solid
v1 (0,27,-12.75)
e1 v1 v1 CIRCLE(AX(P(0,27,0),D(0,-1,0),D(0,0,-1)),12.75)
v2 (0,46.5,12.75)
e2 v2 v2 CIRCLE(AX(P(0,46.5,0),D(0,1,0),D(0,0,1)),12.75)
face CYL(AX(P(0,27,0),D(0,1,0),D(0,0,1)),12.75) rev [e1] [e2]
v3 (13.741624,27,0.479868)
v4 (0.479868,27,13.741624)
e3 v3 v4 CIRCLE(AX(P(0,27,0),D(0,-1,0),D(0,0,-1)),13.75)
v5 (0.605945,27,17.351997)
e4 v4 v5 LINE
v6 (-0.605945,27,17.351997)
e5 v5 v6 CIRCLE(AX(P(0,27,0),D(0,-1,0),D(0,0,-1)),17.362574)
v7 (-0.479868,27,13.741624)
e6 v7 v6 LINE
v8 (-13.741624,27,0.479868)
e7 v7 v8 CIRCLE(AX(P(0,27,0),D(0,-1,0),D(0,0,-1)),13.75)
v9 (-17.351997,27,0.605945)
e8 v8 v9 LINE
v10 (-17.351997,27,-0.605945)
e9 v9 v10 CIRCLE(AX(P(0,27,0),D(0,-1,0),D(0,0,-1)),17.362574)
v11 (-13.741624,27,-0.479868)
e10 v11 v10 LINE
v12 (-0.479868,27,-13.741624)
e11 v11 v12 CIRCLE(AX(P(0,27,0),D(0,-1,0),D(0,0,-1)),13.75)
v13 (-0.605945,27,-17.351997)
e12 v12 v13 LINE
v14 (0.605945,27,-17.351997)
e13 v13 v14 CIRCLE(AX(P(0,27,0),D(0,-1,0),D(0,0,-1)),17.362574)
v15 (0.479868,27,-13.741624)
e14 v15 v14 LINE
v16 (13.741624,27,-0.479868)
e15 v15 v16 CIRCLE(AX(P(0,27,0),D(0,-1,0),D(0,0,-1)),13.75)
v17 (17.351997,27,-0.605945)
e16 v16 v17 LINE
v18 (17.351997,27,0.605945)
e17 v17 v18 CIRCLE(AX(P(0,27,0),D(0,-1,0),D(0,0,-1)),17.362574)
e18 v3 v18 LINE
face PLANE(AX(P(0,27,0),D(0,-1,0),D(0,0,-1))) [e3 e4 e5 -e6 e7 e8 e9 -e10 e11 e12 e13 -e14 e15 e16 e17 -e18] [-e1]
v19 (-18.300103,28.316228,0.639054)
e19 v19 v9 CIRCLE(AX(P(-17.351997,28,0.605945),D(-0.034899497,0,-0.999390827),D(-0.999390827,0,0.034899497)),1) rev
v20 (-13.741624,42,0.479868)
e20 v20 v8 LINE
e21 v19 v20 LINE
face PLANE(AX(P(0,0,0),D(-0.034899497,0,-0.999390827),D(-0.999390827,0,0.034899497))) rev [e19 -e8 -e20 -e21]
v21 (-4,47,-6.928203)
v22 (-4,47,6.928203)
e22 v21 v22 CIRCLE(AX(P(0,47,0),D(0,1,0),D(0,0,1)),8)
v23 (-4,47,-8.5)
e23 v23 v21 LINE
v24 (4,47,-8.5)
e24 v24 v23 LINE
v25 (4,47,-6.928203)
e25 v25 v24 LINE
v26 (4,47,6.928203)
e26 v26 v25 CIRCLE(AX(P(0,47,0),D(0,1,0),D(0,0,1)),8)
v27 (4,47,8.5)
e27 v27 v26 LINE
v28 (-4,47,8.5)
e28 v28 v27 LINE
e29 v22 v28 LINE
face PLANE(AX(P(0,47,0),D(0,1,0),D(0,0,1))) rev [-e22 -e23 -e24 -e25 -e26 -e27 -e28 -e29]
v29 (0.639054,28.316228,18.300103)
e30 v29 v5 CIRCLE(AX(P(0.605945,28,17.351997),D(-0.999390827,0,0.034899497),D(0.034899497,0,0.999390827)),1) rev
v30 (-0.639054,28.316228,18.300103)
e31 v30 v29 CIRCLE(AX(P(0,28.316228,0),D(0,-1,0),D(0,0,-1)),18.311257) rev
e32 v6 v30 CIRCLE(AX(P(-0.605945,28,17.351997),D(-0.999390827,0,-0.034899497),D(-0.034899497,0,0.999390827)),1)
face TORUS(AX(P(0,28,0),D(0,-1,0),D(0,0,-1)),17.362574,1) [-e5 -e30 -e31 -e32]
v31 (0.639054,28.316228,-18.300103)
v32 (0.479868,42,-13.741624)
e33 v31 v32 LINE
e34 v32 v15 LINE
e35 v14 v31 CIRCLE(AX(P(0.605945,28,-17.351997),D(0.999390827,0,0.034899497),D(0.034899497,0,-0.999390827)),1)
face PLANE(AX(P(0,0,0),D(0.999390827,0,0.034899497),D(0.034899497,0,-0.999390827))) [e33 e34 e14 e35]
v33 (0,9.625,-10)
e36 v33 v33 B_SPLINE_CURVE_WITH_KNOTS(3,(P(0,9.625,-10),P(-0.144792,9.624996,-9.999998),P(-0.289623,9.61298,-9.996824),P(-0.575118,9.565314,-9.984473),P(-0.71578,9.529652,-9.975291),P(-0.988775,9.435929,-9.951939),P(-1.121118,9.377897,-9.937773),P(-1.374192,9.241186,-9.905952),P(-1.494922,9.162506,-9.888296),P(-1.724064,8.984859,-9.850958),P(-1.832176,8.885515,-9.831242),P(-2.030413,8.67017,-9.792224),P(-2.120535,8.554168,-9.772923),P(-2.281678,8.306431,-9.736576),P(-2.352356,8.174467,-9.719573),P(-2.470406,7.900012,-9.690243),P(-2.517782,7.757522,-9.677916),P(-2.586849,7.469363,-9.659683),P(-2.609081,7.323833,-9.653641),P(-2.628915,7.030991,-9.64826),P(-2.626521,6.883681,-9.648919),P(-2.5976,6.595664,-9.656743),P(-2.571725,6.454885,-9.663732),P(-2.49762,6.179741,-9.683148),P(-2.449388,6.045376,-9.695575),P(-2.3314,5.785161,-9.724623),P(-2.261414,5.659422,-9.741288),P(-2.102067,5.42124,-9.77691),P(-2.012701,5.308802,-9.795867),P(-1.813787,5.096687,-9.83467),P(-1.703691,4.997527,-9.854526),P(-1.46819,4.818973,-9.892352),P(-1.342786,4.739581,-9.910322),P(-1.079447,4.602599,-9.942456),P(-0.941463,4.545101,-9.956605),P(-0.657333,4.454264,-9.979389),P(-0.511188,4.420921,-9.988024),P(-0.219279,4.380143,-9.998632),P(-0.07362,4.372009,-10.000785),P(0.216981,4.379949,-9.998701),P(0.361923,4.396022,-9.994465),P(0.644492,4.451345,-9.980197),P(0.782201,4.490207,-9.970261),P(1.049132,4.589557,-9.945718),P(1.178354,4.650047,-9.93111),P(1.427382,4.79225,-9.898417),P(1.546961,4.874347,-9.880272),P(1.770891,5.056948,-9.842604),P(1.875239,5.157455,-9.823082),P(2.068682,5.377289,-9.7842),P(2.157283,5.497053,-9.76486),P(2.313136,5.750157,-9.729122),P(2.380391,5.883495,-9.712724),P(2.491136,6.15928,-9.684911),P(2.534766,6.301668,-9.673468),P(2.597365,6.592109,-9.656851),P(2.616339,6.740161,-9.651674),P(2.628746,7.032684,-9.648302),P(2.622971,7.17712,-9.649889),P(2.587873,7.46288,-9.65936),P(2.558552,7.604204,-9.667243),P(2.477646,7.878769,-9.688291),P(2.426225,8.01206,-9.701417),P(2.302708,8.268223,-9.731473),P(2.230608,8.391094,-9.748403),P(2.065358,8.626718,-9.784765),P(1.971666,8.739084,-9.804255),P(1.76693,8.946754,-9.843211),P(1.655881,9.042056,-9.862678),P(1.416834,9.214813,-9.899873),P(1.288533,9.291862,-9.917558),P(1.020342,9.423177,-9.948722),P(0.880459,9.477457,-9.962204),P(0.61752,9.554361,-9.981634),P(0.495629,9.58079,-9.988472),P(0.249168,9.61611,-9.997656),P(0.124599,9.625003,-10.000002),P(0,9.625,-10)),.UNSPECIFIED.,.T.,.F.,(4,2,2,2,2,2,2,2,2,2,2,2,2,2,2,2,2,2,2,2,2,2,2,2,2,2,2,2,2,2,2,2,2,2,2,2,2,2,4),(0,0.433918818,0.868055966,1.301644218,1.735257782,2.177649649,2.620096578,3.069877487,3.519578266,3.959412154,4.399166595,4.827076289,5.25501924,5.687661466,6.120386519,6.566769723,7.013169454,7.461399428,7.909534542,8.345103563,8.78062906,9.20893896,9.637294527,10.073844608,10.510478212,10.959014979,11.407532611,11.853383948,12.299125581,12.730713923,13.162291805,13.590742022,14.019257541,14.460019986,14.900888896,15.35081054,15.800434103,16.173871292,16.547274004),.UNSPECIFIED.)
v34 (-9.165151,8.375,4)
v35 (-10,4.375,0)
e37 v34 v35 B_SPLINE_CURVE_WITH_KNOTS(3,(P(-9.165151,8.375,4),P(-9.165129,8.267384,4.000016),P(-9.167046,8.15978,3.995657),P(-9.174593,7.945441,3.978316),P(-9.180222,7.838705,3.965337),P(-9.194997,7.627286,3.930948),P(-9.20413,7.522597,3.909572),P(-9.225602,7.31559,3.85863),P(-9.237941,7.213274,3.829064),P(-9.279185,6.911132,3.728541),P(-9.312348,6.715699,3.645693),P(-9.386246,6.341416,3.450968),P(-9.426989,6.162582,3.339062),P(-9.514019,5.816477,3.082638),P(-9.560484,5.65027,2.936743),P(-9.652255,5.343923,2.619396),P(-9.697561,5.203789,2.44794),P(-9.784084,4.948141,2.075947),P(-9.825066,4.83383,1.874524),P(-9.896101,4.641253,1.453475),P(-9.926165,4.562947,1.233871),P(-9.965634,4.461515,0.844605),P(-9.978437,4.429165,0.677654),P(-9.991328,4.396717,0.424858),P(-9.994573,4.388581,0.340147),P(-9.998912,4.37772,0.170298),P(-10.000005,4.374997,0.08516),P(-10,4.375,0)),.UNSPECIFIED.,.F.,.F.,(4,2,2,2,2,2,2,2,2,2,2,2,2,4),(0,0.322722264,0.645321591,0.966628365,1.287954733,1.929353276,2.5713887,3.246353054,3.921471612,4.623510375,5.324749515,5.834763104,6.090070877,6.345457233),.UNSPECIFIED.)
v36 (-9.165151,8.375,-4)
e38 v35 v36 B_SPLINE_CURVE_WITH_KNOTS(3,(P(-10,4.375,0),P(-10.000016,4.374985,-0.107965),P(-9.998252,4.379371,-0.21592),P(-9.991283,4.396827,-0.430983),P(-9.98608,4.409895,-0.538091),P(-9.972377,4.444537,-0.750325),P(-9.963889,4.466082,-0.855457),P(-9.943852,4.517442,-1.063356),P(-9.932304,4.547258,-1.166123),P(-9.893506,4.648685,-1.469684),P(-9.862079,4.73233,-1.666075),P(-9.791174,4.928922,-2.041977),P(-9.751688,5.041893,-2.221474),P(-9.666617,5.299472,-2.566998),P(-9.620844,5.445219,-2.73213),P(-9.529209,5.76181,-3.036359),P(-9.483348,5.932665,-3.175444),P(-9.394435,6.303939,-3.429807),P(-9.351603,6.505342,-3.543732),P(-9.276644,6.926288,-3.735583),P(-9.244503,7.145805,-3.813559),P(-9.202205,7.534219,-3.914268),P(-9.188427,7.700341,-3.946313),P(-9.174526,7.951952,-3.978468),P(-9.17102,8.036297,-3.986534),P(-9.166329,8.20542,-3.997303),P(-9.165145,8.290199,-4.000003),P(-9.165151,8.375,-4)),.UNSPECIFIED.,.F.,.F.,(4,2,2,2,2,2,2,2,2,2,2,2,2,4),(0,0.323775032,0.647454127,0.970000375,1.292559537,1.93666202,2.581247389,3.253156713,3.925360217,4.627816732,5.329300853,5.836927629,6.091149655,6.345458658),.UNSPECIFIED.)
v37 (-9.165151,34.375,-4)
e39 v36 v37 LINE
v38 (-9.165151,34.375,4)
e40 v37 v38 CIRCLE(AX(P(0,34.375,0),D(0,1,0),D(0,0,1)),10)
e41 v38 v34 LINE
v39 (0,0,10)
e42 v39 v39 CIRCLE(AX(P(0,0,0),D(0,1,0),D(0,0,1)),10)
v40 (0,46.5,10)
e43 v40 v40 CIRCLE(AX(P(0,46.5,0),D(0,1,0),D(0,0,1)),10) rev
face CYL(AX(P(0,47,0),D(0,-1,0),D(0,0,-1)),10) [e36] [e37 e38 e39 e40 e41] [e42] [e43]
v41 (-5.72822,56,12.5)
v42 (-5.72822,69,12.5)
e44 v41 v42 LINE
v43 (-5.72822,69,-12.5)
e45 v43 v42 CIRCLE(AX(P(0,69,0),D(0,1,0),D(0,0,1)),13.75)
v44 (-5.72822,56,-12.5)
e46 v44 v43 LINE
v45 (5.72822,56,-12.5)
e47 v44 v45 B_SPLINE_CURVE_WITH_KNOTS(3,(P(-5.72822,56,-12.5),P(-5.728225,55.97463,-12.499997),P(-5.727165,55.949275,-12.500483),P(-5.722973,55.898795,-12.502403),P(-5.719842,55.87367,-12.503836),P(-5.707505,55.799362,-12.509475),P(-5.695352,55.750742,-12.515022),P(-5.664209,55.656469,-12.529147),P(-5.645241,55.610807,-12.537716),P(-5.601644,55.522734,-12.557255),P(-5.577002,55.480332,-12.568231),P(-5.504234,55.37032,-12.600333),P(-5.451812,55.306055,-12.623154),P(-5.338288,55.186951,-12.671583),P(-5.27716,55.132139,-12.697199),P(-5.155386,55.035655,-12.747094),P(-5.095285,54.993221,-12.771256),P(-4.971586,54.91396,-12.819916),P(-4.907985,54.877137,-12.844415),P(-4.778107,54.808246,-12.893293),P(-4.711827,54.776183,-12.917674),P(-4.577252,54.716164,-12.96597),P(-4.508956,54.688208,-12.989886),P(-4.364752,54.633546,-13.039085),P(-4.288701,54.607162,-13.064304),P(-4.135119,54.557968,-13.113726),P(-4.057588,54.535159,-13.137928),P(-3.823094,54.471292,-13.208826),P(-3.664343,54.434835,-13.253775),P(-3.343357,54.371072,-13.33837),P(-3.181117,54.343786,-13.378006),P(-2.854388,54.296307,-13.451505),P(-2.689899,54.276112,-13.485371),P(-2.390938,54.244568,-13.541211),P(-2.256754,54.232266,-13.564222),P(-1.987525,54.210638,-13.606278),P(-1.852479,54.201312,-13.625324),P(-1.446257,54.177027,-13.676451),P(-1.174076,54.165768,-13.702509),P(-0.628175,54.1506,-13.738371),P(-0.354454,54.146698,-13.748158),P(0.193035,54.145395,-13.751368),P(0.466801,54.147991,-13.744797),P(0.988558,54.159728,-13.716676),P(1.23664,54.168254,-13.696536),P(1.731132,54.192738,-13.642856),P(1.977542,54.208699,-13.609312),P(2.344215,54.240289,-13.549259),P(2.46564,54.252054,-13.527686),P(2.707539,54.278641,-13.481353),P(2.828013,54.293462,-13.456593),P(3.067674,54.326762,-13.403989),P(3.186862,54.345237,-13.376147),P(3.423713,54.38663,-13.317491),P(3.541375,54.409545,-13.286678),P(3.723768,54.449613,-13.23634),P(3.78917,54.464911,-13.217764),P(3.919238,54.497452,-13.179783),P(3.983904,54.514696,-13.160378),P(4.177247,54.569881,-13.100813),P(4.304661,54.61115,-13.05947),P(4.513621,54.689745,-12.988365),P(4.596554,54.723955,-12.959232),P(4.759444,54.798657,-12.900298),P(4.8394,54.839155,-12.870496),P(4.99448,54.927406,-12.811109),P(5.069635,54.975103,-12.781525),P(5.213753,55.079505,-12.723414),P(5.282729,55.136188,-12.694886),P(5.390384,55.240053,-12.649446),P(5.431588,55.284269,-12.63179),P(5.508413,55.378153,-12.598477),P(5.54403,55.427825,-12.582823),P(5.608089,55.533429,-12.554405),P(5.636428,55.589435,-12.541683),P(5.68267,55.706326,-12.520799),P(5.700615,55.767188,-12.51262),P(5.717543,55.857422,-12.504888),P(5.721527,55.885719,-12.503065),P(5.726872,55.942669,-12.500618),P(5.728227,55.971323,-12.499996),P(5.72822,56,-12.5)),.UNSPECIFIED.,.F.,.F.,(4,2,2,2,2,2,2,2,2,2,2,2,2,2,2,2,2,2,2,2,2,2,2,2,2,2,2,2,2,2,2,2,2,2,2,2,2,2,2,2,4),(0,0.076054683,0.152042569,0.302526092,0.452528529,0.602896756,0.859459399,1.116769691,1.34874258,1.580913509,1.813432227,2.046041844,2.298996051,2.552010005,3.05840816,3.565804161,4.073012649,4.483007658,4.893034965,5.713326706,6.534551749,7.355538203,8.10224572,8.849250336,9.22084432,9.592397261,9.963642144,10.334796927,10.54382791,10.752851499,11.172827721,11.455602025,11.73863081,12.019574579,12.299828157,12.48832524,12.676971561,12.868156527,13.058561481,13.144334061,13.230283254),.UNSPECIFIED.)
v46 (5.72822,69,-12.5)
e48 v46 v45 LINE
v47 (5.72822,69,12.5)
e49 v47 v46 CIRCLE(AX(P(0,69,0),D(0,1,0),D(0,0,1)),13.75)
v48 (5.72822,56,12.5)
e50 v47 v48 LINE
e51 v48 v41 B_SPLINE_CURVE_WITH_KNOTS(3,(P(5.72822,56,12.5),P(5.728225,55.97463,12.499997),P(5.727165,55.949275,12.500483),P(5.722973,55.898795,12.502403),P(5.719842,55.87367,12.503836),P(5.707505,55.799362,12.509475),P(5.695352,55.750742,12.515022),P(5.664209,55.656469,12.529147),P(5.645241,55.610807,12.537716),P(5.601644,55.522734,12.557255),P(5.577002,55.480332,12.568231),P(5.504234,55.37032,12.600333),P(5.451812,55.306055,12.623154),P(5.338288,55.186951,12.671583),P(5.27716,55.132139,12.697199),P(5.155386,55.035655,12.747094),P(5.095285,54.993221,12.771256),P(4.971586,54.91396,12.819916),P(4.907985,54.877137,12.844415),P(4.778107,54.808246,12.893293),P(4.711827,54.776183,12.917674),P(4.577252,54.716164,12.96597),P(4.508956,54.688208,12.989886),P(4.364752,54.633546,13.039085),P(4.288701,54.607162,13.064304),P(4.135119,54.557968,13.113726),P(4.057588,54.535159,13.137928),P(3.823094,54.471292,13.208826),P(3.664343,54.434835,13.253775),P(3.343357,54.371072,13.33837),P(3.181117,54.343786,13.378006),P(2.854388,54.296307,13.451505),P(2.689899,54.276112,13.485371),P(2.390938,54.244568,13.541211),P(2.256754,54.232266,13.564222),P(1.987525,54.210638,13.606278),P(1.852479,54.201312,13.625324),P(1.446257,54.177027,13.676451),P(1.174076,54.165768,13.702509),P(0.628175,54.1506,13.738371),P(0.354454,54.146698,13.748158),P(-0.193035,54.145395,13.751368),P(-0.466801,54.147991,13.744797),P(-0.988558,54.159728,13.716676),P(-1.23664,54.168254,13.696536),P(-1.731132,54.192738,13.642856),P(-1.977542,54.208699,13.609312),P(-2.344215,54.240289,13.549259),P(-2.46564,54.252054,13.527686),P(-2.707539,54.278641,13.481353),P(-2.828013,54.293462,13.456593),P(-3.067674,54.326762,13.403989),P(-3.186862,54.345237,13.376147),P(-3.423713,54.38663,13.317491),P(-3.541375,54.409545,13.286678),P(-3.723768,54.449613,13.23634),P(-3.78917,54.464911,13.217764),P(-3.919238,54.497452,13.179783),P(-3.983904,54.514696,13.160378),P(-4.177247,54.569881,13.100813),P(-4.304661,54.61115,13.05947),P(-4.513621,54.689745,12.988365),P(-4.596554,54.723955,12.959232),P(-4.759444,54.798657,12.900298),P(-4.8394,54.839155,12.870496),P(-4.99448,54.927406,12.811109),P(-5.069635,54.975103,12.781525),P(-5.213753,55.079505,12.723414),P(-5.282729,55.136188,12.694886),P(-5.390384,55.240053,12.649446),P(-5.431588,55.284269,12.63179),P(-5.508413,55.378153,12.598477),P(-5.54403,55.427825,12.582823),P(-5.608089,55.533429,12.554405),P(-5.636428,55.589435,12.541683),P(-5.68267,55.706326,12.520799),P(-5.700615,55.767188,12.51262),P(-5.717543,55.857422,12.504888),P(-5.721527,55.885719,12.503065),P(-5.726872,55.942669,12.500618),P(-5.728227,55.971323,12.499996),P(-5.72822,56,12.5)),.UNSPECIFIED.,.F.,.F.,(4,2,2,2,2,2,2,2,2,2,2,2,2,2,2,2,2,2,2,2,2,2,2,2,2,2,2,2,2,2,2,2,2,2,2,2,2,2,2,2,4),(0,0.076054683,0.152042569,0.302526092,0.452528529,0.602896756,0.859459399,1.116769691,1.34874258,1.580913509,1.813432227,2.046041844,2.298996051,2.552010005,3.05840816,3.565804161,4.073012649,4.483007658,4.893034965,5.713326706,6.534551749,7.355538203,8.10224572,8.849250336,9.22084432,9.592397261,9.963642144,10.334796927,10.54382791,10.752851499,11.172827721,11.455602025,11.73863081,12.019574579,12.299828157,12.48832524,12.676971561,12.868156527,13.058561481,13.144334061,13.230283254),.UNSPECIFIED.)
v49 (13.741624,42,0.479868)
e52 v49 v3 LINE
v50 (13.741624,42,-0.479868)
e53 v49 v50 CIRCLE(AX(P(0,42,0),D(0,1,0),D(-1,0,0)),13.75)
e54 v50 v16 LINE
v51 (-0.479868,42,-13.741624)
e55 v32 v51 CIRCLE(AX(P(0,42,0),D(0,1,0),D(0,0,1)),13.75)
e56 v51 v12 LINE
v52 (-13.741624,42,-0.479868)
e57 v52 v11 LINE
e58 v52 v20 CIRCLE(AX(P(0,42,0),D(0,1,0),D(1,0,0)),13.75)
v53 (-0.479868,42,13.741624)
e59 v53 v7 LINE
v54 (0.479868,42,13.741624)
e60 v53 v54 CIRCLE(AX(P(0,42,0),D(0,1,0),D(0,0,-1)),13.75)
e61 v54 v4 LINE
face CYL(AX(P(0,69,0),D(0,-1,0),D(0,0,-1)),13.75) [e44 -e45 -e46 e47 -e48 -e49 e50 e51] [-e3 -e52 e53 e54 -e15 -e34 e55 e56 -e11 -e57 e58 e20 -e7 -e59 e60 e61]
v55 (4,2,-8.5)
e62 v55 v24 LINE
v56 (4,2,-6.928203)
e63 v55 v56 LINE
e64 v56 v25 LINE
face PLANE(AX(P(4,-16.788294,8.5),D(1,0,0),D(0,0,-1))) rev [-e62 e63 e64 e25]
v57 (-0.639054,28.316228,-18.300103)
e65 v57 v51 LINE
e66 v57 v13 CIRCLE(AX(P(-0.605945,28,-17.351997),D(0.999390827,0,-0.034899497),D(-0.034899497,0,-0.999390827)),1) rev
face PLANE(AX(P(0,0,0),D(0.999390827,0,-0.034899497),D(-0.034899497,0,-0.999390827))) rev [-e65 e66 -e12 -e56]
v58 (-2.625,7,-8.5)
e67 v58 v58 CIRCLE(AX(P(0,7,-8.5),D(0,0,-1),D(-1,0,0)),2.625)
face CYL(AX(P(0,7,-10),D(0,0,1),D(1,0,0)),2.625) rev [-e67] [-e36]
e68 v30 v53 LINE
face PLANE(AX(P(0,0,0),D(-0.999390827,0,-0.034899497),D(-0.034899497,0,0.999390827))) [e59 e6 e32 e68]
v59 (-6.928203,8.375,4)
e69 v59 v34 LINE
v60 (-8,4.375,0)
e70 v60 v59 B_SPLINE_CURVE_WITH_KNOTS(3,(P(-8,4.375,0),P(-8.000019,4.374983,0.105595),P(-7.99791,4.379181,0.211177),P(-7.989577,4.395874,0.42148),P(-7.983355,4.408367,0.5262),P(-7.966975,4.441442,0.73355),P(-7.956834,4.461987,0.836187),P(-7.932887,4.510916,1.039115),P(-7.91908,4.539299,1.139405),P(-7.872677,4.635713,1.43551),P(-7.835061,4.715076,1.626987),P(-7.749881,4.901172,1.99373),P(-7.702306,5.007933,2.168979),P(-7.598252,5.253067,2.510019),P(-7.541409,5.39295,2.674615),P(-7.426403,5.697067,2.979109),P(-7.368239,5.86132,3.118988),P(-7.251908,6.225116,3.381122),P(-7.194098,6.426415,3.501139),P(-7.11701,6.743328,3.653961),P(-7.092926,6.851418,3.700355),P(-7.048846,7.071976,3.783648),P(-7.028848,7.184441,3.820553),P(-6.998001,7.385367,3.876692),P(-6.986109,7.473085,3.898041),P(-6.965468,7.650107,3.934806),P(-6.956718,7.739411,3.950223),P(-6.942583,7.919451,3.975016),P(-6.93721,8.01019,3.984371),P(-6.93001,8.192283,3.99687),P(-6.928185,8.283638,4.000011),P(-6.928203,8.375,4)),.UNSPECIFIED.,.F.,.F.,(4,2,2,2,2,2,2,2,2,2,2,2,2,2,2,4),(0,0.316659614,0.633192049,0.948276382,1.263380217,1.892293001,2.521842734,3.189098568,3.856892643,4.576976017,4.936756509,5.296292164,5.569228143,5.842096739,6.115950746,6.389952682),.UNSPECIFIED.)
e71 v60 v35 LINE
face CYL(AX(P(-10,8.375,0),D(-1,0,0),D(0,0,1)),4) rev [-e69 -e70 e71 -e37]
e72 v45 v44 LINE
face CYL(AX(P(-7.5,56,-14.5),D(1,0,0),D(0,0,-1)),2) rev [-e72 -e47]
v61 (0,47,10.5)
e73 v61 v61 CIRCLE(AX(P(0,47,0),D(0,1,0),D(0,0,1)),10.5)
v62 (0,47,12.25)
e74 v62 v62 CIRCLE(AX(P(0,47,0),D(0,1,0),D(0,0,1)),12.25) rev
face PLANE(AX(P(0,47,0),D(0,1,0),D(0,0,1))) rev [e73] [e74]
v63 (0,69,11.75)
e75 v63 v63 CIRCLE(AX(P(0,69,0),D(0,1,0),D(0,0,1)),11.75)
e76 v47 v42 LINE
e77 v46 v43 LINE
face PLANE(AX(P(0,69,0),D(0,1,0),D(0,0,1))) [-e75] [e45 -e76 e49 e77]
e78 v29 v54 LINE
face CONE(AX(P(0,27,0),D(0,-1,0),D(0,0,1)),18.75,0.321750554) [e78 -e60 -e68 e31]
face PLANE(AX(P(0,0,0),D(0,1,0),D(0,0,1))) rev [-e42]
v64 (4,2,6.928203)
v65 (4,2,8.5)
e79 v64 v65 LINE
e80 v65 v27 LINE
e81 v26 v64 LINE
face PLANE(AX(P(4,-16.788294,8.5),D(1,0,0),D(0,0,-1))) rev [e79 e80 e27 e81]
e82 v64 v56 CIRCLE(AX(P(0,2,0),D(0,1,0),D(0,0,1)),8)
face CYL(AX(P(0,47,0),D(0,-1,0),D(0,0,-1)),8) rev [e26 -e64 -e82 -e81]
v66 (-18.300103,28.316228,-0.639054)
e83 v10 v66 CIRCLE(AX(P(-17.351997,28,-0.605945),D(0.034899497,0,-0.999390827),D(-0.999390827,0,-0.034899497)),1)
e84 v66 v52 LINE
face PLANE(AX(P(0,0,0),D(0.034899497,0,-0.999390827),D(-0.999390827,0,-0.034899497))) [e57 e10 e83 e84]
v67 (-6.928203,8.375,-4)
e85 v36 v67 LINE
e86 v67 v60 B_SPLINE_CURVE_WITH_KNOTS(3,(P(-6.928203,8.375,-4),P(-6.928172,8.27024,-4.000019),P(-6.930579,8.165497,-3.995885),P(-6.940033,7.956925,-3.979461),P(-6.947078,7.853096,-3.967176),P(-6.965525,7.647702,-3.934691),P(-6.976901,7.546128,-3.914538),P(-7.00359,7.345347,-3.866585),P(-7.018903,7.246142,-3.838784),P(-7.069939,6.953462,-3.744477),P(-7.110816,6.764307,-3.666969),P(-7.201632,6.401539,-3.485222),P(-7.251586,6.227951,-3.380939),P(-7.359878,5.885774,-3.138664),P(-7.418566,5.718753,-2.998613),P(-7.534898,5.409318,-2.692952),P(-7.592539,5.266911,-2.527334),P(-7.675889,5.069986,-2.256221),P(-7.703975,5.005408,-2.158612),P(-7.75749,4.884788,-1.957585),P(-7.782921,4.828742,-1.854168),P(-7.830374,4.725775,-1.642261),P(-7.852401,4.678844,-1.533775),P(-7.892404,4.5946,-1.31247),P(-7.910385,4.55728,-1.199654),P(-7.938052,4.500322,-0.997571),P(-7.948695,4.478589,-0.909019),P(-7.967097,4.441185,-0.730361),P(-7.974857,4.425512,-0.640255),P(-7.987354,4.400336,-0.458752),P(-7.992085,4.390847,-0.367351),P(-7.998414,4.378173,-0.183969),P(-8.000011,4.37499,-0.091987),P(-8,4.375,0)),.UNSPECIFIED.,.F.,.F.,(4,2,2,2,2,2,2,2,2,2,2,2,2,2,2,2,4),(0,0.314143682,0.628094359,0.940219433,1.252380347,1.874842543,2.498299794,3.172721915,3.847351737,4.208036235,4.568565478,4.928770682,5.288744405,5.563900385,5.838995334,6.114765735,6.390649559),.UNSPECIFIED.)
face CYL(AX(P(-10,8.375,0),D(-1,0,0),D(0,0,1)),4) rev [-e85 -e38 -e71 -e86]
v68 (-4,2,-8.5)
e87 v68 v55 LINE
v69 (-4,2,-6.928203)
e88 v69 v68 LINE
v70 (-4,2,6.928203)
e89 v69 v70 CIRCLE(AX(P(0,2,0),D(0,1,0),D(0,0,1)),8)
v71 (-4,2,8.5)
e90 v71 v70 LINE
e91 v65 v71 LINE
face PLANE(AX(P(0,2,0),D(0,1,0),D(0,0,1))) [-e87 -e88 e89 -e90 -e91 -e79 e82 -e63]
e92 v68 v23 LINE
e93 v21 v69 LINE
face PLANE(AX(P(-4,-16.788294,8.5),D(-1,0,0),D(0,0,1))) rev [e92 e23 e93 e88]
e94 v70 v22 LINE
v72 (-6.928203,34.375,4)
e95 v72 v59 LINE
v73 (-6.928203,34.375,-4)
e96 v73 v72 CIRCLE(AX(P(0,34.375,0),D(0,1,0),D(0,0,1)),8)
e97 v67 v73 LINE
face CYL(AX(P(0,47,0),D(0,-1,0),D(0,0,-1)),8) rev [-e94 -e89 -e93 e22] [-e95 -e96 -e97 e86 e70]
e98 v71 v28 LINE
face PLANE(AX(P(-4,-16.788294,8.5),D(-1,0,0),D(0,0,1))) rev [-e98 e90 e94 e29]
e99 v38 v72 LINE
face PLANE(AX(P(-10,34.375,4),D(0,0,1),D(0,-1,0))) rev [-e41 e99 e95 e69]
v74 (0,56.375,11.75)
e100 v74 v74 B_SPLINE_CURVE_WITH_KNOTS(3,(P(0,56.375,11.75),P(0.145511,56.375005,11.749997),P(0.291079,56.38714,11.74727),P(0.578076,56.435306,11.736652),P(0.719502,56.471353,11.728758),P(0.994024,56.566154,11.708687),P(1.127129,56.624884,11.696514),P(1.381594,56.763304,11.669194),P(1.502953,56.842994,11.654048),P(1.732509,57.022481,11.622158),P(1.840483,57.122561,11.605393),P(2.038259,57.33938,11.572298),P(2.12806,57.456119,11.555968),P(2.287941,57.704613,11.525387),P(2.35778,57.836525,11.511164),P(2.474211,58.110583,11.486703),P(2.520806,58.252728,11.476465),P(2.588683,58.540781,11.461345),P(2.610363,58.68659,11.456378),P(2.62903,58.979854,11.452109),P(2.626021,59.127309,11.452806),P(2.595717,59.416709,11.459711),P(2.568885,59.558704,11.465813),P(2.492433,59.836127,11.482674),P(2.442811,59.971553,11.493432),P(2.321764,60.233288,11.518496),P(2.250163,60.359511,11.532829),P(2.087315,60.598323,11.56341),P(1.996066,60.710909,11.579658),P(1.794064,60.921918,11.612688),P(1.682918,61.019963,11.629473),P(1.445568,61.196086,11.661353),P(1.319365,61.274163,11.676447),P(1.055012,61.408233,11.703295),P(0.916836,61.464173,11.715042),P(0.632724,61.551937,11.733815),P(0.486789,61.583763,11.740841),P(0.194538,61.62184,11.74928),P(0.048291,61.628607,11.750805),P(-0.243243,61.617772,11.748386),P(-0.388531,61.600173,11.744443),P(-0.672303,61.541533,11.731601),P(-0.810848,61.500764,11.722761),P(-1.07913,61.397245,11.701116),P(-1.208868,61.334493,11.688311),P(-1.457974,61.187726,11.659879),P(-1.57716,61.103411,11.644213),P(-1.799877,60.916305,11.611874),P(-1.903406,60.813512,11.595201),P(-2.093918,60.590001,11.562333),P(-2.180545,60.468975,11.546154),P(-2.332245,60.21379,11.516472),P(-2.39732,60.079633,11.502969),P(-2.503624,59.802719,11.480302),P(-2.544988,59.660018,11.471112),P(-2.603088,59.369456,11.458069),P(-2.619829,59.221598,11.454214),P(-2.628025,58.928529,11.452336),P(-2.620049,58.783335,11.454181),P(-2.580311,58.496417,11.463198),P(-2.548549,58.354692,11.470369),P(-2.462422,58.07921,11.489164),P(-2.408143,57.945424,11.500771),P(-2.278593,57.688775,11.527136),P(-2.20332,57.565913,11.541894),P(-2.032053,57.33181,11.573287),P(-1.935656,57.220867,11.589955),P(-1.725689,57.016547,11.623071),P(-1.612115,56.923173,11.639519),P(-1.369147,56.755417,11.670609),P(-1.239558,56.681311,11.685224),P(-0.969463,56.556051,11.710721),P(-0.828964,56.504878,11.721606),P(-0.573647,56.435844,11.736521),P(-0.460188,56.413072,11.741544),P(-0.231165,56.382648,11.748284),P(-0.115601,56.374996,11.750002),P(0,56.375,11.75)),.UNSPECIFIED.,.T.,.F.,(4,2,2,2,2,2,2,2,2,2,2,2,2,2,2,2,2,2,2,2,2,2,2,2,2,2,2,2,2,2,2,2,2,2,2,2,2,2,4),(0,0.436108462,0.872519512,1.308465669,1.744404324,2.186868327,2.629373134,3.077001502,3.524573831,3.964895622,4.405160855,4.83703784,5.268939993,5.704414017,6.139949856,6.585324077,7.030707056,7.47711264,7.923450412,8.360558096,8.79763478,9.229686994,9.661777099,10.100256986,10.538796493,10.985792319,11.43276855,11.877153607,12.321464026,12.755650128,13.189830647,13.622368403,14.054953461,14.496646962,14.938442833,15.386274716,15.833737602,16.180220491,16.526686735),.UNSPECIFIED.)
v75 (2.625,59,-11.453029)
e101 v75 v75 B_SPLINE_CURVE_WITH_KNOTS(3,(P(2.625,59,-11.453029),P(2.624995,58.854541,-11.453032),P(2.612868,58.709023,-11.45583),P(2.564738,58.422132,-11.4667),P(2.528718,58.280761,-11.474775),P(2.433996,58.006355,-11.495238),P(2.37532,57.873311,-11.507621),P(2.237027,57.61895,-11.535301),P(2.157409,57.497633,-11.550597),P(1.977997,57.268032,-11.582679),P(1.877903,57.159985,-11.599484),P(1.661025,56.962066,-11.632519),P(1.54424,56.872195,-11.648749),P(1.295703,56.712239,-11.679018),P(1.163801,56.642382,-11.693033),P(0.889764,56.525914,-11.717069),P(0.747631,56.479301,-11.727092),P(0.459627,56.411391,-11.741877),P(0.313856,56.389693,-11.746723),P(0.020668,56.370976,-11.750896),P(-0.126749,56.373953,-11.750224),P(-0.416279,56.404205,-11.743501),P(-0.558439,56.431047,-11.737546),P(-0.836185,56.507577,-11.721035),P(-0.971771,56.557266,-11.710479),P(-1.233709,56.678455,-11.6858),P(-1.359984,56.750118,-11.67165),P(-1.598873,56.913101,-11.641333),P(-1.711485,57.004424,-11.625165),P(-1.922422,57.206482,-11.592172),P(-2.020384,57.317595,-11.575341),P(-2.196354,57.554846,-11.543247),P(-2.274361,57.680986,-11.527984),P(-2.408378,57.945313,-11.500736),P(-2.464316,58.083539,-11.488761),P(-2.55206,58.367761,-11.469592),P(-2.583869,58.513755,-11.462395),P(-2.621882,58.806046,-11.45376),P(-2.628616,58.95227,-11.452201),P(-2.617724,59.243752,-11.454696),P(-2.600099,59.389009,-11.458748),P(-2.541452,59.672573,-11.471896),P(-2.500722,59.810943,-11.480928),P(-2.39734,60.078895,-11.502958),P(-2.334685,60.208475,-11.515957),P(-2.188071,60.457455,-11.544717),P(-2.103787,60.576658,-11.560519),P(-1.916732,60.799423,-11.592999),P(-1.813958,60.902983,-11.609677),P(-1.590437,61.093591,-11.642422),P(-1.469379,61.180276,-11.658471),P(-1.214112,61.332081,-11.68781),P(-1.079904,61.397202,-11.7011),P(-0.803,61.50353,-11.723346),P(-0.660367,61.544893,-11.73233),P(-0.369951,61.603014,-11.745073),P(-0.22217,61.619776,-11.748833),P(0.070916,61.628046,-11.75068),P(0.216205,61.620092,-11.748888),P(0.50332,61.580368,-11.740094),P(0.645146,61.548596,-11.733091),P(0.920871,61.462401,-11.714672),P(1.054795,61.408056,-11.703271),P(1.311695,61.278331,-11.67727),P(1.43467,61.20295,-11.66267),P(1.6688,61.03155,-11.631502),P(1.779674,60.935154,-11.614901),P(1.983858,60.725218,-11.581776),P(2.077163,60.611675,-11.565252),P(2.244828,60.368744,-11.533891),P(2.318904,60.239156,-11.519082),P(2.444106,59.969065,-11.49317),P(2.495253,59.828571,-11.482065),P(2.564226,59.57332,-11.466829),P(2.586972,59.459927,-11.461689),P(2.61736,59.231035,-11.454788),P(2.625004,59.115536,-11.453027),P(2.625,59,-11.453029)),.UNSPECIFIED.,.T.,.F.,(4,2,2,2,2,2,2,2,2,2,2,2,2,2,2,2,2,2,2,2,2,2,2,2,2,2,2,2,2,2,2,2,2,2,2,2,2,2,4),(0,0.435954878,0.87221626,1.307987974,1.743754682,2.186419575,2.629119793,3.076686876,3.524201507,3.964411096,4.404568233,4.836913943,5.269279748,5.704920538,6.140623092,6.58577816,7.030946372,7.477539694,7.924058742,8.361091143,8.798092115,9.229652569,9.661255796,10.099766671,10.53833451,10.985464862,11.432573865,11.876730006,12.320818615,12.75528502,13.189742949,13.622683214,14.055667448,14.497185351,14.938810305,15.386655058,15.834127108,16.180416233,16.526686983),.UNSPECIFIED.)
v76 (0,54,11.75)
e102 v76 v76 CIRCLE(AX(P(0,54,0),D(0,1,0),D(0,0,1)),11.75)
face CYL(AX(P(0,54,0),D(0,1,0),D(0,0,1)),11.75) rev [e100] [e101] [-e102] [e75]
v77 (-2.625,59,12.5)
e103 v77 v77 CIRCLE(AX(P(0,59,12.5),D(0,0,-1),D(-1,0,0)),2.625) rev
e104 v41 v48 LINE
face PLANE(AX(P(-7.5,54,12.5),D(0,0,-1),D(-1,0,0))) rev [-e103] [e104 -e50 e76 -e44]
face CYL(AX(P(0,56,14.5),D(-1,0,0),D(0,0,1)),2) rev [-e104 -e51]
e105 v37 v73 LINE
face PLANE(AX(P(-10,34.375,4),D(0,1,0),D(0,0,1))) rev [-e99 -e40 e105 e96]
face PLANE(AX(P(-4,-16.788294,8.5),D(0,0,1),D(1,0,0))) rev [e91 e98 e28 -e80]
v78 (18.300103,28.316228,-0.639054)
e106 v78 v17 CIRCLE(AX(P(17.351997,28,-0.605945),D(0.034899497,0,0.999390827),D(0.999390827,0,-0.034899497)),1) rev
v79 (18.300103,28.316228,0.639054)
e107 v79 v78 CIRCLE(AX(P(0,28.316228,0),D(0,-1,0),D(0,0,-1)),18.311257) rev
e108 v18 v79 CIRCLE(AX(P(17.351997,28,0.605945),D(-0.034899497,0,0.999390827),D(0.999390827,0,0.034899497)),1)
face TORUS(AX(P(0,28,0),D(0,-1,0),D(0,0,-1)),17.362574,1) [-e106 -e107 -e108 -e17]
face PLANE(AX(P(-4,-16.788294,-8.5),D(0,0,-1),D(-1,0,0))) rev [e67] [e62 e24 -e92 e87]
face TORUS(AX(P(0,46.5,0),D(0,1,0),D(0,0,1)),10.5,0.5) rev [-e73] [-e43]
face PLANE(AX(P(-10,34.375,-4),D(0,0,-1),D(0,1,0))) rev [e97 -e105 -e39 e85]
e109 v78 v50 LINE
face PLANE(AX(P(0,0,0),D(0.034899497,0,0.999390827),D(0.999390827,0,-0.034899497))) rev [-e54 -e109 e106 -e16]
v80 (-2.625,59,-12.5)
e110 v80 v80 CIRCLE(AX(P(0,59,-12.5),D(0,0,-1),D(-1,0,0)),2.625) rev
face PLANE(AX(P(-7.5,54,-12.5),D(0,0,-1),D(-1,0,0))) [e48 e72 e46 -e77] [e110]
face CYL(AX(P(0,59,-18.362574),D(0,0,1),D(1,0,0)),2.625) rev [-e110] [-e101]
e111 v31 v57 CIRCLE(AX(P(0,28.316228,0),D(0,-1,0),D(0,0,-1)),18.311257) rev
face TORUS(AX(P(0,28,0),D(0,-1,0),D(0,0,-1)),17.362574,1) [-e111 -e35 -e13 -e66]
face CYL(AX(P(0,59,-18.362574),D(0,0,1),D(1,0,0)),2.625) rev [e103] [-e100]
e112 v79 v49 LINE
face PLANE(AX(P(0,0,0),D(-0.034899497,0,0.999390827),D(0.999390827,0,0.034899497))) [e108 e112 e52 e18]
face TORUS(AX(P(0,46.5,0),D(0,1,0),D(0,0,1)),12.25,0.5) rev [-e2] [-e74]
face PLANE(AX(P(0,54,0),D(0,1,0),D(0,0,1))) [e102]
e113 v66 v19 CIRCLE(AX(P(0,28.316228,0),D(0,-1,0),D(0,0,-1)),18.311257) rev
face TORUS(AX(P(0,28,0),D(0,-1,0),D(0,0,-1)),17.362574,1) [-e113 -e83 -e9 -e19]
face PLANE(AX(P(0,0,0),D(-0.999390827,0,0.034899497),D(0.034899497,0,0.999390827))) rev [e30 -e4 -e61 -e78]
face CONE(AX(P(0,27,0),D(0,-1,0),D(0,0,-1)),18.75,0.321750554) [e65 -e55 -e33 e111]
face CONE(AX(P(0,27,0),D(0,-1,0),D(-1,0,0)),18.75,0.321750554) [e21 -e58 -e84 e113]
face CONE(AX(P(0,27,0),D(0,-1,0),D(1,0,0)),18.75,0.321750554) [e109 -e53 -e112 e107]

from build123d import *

# Parameters (mm, degrees)
SKETCH1_R                = 10
BOSS_EXTRUDE1_DEPTH      = 47
SHELL1_T                 = -2
SKETCH2_W                = 8
SKETCH2_H                = 17
CUT_EXTRUDE1_DEPTH       = 45
SKETCH3_R                = 2.625
CUT_EXTRUDE2_DEPTH       = 50.081564767
SKETCH4_R                = 13.75
BOSS_EXTRUDE2_DEPTH      = 22
BOSS_EXTRUDE3_START      = 20
SKETCH5_R                = 13.75
SKETCH5_R_2              = 12.75
BOSS_EXTRUDE3_DEPTH      = 20
FILLET1_R                = 0.5
SKETCH6_W                = 8
SKETCH6_H                = 30
CUT_EXTRUDE3_DEPTH       = 10
FILLET2_R                = 4
REVOLVE5_ANGLE           = 4
FILLET3_R                = 1
CIRPATTERN1_COUNT        = 4
FILLET3_OF_CIRPATTERN1_R = 1
SKETCH9_R                = 11.75
CUT_EXTRUDE4_DEPTH       = 15
CUT_EXTRUDE6_DEPTH       = 74.724950074
CUT_EXTRUDE6_DEPTH_BACK  = 74.724950074
SKETCH10_R               = 2.625
SKETCH11_W               = 15
SKETCH11_H               = 2
CUT_EXTRUDE7_DEPTH       = 15
FILLET4_R                = 2


# Some blends are built 0.0001 mm under size
with BuildPart() as part:
    # Sketch1 → Boss-Extrude1 (new body)
    with BuildSketch(Plane(origin=(0, 0, 0), x_dir=(1, 0, 0), z_dir=(0, 1, 0))):
        with Locations(Location((0, 0, 0), (0, 0, 270))):
            Circle(SKETCH1_R)
    extrude(amount=BOSS_EXTRUDE1_DEPTH)

    # Shell1
    shell1_openings = [part.faces().sort_by_distance(p)[0] for p in [
        (0, 47, 0),
    ]]
    offset(amount=SHELL1_T, openings=shell1_openings, kind=Kind.INTERSECTION)

    # Sketch2 → Cut-Extrude1 (cut)
    with BuildSketch(Plane(origin=(0, 47, 0), x_dir=(1, 0, 0), z_dir=(0, 1, 0))):
        Rectangle(SKETCH2_W, SKETCH2_H)
    extrude(amount=-CUT_EXTRUDE1_DEPTH, mode=Mode.SUBTRACT)

    # Sketch3 → Cut-Extrude2 (cut, through all)
    with BuildSketch(Plane.XY):
        with Locations(Location((0, 7, 0), (0, 0, 90))):
            Circle(SKETCH3_R)
    extrude(amount=-CUT_EXTRUDE2_DEPTH, mode=Mode.SUBTRACT)

    # Sketch4 → Boss-Extrude2 (add)
    with BuildSketch(Plane(origin=(0, 47, 0), x_dir=(1, 0, 0), z_dir=(0, 1, 0))):
        with Locations(Location((0, 0, 0), (0, 0, 270))):
            Circle(SKETCH4_R)
    extrude(amount=BOSS_EXTRUDE2_DEPTH)

    # Sketch5 → Boss-Extrude3 (add)
    with BuildSketch(Plane.XZ.offset(-47).offset(BOSS_EXTRUDE3_START)):
        with Locations(Location((0, 0, 0), (0, 0, 270))):
            Circle(SKETCH5_R)
        with Locations(Location((0, 0, 0), (0, 0, 270))):
            Circle(SKETCH5_R_2, mode=Mode.SUBTRACT)
    extrude(amount=-BOSS_EXTRUDE3_DEPTH)

    # Fillet1
    fillet1_edges = [part.edges().sort_by_distance(p)[0] for p in [
        (0, 47, -10),
        (0, 47, 12.75),
    ]]
    fillet(fillet1_edges, radius=FILLET1_R)

    # Sketch6 → Cut-Extrude3 (cut)
    with BuildSketch(Plane(origin=(0, 0, 0), x_dir=(0, 0, -1), z_dir=(1, 0, 0))):
        with Locations((0, 19.375)):
            Rectangle(SKETCH6_W, SKETCH6_H)
    extrude(amount=-CUT_EXTRUDE3_DEPTH, mode=Mode.SUBTRACT)

    # Fillet2
    fillet2_edges = [part.edges().sort_by_distance(p)[0] for p in [
        (-8.04667731, 4.375, 4),
        (-8.04667731, 4.375, -4),
    ]]
    fillet(fillet2_edges, radius=FILLET2_R - 0.0001)  # a hair under: the kernel refuses the full size

    # Sketch8 → Revolve5 (revolve, symmetric)
    with BuildSketch(Plane(origin=(0, 0, 0), x_dir=(0, 0, -1), z_dir=(1, 0, 0))) as revolve5_sk:
        Polygon((13.75, 27), (18.75, 27), (13.75, 42), align=None)
    revolve5 = revolve(axis=Axis((0, 88.2, 0), (0, -1, 0)), revolution_arc=REVOLVE5_ANGLE / 2)
    revolve5 = revolve5 + revolve(revolve5_sk.sketch, axis=Axis((0, 88.2, 0), (0, 1, 0)), revolution_arc=REVOLVE5_ANGLE / 2)

    # Fillet3
    fillet3_edges = [part.edges().sort_by_distance(p)[0] for p in [
        (0, 27, -18.75),
    ]]
    fillet(fillet3_edges, radius=FILLET3_R)

    # CirPattern1: Revolve5 ×4 about axis
    cirpattern1_axis = Axis((0, 88.2, 0), (0, -1, 0))
    for i in range(1, CIRPATTERN1_COUNT):
        add(revolve5.rotate(cirpattern1_axis, i * 360 / CIRPATTERN1_COUNT))

    # Fillet3 of CirPattern1
    fillet3_of_cirpattern1_edges = [part.edges().sort_by_distance(p)[0] for p in [
        (18.75, 27, 0),
        (0, 27, 18.75),
        (-18.75, 27, 0),
    ]]
    fillet(fillet3_of_cirpattern1_edges, radius=FILLET3_OF_CIRPATTERN1_R)

    # Sketch9 → Cut-Extrude4 (cut)
    with BuildSketch(Plane(origin=(0, 69, 0), x_dir=(1, 0, 0), z_dir=(0, 1, 0))):
        with Locations(Location((0, 0, 0), (0, 0, 270))):
            Circle(SKETCH9_R)
    extrude(amount=-CUT_EXTRUDE4_DEPTH, mode=Mode.SUBTRACT)

    # Sketch10 → Cut-Extrude6 (cut, two sides: drawn at the far end of the back side and taken through both)
    with BuildSketch(Plane.XY.offset(-CUT_EXTRUDE6_DEPTH_BACK)):
        with Locations((0, 59)):
            Circle(SKETCH10_R)
    extrude(amount=CUT_EXTRUDE6_DEPTH + CUT_EXTRUDE6_DEPTH_BACK, mode=Mode.SUBTRACT)

    # Sketch11 → Cut-Extrude7 (cut)
    with BuildSketch(Plane(origin=(0, 69, 0), x_dir=(1, 0, 0), z_dir=(0, 1, 0))):
        with Locations((0, -13.5)):
            Rectangle(SKETCH11_W, SKETCH11_H)
    cut_extrude7 = extrude(amount=-CUT_EXTRUDE7_DEPTH, mode=Mode.SUBTRACT)

    # Mirror1: Cut-Extrude7 across plane
    add(cut_extrude7.mirror(Plane.XY), mode=Mode.SUBTRACT)

    # Fillet4
    # the kernel refuses this fillet: 2 mm, written as the material it adds along each edge
    with BuildSketch(Plane(origin=(-10.728219619, 54, -12.5), x_dir=(0, 1, 0), z_dir=(1, 0, 0))) as fillet4_piece_1_section:
        with BuildLine():
            CenterArc((FILLET4_R, -FILLET4_R), FILLET4_R, 90, 90)
            Line((0, -FILLET4_R), (0, 0))
            Line((0, 0), (FILLET4_R, 0))
        make_face()
    fillet4_piece_1 = extrude(amount=21.456439237, mode=Mode.PRIVATE)
    fillet4_piece_1 = fillet4_piece_1 & Plane(origin=(0, 54.536479762, 0), x_dir=(0, 0, 1), z_dir=(0, -1, 0)) * Cylinder(13.75, 51, mode=Mode.PRIVATE)
    add(fillet4_piece_1)
    with BuildSketch(Plane(origin=(-10.728219619, 54, 12.5), x_dir=(0, 0, 1), z_dir=(1, 0, 0))) as fillet4_piece_2_section:
        with BuildLine():
            CenterArc((FILLET4_R, -FILLET4_R), FILLET4_R, 90, 90)
            Line((0, -FILLET4_R), (0, 0))
            Line((0, 0), (FILLET4_R, 0))
        make_face()
    fillet4_piece_2 = extrude(amount=21.456439237, mode=Mode.PRIVATE)
    fillet4_piece_2 = fillet4_piece_2 & Plane(origin=(0, 54.536497639, 0), x_dir=(0, 0, 1), z_dir=(0, -1, 0)) * Cylinder(13.75, 51, mode=Mode.PRIVATE)
    add(fillet4_piece_2)


solid = part.part
